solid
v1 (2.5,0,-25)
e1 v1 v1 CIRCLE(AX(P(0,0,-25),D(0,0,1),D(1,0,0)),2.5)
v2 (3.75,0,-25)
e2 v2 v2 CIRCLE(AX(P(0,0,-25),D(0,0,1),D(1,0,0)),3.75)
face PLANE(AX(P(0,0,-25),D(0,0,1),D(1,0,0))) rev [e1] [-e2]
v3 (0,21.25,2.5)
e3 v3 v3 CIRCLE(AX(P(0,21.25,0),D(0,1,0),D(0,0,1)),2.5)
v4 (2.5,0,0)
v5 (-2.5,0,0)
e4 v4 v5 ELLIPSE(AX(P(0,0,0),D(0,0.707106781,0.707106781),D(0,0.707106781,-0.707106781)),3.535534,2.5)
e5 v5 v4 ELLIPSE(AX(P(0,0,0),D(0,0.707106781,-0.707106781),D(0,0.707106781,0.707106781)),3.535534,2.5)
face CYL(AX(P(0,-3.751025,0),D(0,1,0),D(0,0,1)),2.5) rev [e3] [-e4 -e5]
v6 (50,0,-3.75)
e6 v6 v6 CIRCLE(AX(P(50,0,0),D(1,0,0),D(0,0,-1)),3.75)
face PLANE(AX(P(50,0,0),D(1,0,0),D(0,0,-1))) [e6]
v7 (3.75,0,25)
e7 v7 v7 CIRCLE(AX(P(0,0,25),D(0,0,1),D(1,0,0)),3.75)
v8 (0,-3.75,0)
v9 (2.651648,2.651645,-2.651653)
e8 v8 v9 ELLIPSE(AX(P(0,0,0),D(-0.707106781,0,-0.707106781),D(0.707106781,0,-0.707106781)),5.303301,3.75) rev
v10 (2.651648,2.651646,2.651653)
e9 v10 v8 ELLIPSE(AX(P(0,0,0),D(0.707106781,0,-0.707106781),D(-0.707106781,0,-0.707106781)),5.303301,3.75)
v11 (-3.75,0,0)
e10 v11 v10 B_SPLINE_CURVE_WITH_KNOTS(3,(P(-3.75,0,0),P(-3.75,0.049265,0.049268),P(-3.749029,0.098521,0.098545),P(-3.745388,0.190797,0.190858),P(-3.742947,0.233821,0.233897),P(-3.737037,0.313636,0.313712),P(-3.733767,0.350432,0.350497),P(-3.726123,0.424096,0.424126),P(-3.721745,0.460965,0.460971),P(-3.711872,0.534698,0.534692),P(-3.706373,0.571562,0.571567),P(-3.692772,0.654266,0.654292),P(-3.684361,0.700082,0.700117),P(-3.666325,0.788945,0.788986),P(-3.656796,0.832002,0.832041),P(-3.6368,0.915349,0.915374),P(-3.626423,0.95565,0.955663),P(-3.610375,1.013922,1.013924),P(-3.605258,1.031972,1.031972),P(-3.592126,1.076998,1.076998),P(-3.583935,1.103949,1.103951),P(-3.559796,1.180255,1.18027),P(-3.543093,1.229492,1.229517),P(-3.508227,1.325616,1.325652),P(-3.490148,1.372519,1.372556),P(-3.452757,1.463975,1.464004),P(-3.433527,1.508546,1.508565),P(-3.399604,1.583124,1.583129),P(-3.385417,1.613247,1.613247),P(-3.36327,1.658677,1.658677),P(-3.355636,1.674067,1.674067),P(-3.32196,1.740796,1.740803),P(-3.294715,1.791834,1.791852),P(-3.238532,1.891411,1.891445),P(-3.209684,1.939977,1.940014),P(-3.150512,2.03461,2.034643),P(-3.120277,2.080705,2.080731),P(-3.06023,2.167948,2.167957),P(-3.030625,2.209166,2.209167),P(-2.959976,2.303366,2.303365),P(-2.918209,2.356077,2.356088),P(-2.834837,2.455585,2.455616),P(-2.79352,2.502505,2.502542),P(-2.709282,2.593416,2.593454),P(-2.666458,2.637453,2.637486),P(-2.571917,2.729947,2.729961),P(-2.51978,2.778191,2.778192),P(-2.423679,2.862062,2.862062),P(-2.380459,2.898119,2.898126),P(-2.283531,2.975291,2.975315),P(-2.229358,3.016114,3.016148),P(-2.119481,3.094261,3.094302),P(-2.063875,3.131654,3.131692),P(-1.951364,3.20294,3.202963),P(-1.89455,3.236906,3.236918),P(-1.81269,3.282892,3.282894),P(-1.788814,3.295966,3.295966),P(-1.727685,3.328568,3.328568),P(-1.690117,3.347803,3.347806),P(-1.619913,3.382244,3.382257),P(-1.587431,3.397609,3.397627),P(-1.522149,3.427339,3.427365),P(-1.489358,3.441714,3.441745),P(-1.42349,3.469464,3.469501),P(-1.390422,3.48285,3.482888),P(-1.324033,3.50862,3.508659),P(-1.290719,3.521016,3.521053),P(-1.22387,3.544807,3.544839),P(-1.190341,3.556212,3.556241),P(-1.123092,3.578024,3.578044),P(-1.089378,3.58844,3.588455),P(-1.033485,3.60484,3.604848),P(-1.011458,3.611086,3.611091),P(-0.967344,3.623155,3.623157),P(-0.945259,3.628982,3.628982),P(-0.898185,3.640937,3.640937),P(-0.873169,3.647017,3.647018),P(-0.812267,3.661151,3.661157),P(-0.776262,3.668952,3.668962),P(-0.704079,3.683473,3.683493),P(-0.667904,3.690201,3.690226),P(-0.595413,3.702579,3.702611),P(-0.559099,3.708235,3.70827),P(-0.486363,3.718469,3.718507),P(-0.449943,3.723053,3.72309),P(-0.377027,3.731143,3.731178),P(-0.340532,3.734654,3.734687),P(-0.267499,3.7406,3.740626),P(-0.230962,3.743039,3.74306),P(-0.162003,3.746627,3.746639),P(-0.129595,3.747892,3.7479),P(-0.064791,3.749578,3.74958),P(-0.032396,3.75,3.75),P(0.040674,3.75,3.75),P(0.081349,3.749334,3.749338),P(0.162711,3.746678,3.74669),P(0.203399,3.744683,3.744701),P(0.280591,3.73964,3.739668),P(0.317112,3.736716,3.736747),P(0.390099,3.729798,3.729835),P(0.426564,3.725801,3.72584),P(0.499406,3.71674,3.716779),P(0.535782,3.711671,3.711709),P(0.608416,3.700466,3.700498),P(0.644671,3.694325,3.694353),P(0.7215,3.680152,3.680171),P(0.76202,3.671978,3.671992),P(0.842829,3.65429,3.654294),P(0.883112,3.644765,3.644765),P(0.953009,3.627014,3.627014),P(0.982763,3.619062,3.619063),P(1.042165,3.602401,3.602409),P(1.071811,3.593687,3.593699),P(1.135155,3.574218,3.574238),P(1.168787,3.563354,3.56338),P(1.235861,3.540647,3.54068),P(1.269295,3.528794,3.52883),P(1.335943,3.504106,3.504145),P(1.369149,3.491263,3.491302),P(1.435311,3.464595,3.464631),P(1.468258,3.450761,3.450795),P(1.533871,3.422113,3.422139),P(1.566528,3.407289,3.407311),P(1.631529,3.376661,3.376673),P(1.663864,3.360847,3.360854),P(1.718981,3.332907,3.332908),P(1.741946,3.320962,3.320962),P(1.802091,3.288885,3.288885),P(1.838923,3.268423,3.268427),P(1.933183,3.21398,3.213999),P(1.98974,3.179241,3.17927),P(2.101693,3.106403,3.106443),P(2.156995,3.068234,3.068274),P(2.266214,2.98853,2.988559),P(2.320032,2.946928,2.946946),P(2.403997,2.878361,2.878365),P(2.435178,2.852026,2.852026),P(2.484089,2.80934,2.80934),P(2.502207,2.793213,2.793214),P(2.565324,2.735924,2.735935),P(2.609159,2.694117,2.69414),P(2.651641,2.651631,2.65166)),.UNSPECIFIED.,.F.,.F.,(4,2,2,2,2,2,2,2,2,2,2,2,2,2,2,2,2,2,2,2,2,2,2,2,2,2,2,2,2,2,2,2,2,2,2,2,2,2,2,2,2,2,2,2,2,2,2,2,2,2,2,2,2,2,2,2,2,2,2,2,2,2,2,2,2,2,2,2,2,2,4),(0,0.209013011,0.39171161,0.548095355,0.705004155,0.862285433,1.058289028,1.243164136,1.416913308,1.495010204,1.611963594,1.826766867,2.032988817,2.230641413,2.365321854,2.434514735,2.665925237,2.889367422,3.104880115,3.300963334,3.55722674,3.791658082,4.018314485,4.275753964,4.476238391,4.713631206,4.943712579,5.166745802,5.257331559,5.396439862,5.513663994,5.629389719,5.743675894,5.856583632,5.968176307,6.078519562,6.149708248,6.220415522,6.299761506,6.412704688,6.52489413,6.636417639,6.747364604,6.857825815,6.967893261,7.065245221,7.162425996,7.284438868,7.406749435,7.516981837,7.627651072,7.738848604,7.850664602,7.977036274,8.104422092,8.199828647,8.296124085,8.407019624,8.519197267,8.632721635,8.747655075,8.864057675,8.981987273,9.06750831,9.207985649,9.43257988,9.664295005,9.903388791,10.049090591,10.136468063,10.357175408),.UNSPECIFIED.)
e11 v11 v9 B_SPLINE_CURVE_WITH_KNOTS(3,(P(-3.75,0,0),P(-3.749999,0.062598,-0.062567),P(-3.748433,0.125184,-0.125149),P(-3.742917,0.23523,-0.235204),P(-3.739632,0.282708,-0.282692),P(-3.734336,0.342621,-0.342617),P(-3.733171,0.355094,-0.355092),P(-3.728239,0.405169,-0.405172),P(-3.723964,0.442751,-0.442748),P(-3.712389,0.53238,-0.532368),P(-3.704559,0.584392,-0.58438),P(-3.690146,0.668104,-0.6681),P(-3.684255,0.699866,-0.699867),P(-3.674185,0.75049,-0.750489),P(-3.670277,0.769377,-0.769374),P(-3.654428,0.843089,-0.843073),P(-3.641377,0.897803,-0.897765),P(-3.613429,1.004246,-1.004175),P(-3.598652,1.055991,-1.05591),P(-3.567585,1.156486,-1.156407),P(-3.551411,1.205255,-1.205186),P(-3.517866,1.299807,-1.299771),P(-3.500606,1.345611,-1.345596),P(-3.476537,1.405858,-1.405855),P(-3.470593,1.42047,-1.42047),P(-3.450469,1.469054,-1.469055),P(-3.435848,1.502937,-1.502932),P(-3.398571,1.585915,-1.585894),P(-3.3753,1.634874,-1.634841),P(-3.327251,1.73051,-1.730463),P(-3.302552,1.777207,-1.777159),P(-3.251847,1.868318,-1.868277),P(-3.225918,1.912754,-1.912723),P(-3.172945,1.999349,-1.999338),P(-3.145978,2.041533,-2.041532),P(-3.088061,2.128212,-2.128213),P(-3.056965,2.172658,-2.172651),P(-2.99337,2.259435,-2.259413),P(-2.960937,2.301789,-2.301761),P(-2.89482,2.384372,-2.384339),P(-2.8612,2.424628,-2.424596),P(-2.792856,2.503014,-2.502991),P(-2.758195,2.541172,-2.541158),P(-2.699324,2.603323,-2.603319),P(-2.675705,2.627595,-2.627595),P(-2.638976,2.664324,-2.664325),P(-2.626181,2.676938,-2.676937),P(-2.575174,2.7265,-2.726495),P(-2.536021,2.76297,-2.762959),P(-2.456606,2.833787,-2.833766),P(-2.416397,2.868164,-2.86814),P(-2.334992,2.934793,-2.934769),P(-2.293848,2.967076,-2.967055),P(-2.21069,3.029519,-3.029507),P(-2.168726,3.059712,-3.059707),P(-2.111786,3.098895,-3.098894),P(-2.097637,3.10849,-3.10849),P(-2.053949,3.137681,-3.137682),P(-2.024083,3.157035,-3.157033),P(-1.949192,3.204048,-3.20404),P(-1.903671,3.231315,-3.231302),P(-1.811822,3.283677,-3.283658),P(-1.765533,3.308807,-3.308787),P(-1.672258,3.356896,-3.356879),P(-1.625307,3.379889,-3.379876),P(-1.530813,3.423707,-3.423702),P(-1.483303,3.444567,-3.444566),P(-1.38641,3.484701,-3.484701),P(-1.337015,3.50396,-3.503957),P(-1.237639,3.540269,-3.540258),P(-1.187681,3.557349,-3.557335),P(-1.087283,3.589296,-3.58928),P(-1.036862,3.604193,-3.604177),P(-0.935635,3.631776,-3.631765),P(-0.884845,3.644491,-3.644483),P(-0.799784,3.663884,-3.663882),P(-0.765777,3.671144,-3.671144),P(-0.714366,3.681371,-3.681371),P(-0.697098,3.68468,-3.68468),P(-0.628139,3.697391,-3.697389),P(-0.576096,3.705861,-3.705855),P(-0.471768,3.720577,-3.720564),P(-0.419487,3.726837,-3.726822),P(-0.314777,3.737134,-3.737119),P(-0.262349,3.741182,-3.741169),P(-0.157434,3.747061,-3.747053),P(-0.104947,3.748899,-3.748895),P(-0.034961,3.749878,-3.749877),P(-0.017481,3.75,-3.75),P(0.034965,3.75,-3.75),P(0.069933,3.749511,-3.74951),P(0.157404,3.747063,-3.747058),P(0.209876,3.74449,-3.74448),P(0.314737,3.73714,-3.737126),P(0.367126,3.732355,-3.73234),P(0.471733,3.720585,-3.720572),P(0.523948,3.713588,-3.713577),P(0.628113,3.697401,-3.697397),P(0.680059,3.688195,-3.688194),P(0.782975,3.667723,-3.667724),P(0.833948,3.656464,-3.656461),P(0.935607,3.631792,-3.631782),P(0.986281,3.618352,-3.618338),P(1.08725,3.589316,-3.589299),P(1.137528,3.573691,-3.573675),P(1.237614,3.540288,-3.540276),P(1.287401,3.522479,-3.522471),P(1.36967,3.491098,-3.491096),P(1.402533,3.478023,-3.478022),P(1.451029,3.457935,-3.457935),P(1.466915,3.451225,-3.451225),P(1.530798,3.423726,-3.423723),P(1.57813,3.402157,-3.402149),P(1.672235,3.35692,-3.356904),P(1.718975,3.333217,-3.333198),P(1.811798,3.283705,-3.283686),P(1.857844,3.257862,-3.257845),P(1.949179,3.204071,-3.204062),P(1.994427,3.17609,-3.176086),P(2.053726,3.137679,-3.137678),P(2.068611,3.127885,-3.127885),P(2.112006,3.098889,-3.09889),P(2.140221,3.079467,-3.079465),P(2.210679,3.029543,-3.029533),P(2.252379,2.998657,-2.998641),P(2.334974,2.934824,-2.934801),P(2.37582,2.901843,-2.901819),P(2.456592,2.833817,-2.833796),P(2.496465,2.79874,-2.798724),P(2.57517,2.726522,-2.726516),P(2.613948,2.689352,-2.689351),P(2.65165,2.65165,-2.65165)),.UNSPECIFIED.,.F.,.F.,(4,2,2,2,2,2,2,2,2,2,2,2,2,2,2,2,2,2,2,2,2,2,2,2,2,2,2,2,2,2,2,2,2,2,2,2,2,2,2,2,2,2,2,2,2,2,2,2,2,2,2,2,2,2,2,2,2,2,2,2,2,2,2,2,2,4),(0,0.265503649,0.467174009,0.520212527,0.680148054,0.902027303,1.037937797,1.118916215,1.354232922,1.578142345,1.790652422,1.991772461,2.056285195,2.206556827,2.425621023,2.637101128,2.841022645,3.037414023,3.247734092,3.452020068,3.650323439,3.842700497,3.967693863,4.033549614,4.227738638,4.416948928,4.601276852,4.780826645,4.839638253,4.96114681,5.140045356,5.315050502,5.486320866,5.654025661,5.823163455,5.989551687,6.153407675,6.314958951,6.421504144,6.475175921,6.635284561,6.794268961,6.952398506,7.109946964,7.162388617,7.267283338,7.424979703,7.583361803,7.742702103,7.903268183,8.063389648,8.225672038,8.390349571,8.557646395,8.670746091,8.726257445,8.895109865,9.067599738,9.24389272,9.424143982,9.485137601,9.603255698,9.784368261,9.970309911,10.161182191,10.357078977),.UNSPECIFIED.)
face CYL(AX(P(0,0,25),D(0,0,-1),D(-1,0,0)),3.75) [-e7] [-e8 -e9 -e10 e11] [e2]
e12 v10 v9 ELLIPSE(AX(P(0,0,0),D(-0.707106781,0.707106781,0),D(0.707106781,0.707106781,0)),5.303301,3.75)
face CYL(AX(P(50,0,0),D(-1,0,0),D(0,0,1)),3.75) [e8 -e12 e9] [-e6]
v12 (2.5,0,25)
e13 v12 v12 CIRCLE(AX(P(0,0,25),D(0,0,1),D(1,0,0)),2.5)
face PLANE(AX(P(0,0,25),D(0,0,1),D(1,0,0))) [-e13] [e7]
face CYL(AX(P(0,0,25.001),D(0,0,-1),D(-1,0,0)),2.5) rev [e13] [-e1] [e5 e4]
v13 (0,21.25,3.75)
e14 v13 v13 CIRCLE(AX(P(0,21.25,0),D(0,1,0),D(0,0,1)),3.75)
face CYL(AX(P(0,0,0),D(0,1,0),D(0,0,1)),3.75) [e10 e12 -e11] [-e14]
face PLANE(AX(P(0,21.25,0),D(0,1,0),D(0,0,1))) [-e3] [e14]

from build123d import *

# Parameters (mm, degrees)
SKETCH1_R                = 3.75
BOSS_EXTRUDE1_DEPTH      = 25
BOSS_EXTRUDE10_START     = -1e-07
BOSS_EXTRUDE10_OUTLINE_R = 3.75
BOSS_EXTRUDE10_DEPTH     = 53.7500002
BOSS_EXTRUDE10_START_2   = -5
BOSS_EXTRUDE10_2_DEPTH   = 10
CUT_REVOLVE2_START       = -5
CUT_REVOLVE2_OUTLINE_W   = 10
CUT_REVOLVE2_OUTLINE_H   = 33.75
CUT_REVOLVE2_DEPTH       = 10
SKETCH10_R               = 3.75
BOSS_EXTRUDE18_DEPTH     = 50
SKETCH11_R               = 2.5
CUT_EXTRUDE12_DEPTH      = 50
CUT_EXTRUDE14_START      = -21.25
SKETCH13_R               = 2.5
CUT_EXTRUDE14_DEPTH      = 21.25


with BuildPart() as part:
    # Sketch1 → Boss-Extrude1 (new, symmetric)
    with BuildSketch(Plane.XY):
        Circle(SKETCH1_R)
    extrude(amount=BOSS_EXTRUDE1_DEPTH, both=True)

    # Boss-Extrude10: read off the stored shape, not the designer's step
    # Boss-Extrude10 outline → Boss-Extrude10 (add)
    with BuildSketch(Plane(origin=(0, 0, 0), x_dir=(1, 0, 0), z_dir=(0, 1, 0)).offset(BOSS_EXTRUDE10_START)):
        Circle(BOSS_EXTRUDE10_OUTLINE_R)
    extrude(amount=BOSS_EXTRUDE10_DEPTH)

    # Boss-Extrude10 2 outline → Boss-Extrude10 2 (cut)
    with BuildSketch(Plane.XY.offset(BOSS_EXTRUDE10_START_2)):
        with BuildLine():
            Line((-5, 50), (-3.75, 50))
            ThreePointArc((-3.75, 50), (-2.651650429, 52.651650429), (0, 53.75))
            Line((0, 53.75), (-5, 53.7500001))
            Line((-5, 53.7500001), (-5, 50))
        make_face()
        with BuildLine():
            Line((5, 53.7500001), (0, 53.75))
            ThreePointArc((0, 53.75), (2.651650429, 52.651650429), (3.75, 50))
            Line((3.75, 50), (5, 50))
            Line((5, 50), (5, 53.7500001))
        make_face()
    extrude(amount=BOSS_EXTRUDE10_2_DEPTH, mode=Mode.SUBTRACT)

    # Cut-Revolve2: read off the stored shape, not the designer's step
    # Cut-Revolve2 outline → Cut-Revolve2 (cut)
    with BuildSketch(Plane(origin=(0, 0, 0), x_dir=(0, 0, -1), z_dir=(1, 0, 0)).offset(CUT_REVOLVE2_START)):
        with Locations((0, 38.125)):
            Rectangle(CUT_REVOLVE2_OUTLINE_W, CUT_REVOLVE2_OUTLINE_H)
    extrude(amount=CUT_REVOLVE2_DEPTH, mode=Mode.SUBTRACT)

    # Sketch10 → Boss-Extrude18 (add)
    with BuildSketch(Plane(origin=(0, 0, 0), x_dir=(0, 0, -1), z_dir=(1, 0, 0))):
        Circle(SKETCH10_R)
    extrude(amount=BOSS_EXTRUDE18_DEPTH)

    # Sketch11 → Cut-Extrude12 (cut)
    with BuildSketch(Plane(origin=(0, 0, -25), x_dir=(-1, 0, 0), z_dir=(0, 0, -1))):
        with Locations(Location((0, 0, 0), (0, 0, 180))):
            Circle(SKETCH11_R)
    extrude(amount=-CUT_EXTRUDE12_DEPTH, mode=Mode.SUBTRACT)

    # Sketch13 → Cut-Extrude14 (cut)
    with BuildSketch(Plane(origin=(0, 21.25, 0), x_dir=(1, 0, 0), z_dir=(0, 1, 0)).offset(CUT_EXTRUDE14_START)):
        with Locations(Location((0, 0, 0), (0, 0, 270))):
            Circle(SKETCH13_R)
    extrude(amount=CUT_EXTRUDE14_DEPTH, mode=Mode.SUBTRACT)


solid = part.part
